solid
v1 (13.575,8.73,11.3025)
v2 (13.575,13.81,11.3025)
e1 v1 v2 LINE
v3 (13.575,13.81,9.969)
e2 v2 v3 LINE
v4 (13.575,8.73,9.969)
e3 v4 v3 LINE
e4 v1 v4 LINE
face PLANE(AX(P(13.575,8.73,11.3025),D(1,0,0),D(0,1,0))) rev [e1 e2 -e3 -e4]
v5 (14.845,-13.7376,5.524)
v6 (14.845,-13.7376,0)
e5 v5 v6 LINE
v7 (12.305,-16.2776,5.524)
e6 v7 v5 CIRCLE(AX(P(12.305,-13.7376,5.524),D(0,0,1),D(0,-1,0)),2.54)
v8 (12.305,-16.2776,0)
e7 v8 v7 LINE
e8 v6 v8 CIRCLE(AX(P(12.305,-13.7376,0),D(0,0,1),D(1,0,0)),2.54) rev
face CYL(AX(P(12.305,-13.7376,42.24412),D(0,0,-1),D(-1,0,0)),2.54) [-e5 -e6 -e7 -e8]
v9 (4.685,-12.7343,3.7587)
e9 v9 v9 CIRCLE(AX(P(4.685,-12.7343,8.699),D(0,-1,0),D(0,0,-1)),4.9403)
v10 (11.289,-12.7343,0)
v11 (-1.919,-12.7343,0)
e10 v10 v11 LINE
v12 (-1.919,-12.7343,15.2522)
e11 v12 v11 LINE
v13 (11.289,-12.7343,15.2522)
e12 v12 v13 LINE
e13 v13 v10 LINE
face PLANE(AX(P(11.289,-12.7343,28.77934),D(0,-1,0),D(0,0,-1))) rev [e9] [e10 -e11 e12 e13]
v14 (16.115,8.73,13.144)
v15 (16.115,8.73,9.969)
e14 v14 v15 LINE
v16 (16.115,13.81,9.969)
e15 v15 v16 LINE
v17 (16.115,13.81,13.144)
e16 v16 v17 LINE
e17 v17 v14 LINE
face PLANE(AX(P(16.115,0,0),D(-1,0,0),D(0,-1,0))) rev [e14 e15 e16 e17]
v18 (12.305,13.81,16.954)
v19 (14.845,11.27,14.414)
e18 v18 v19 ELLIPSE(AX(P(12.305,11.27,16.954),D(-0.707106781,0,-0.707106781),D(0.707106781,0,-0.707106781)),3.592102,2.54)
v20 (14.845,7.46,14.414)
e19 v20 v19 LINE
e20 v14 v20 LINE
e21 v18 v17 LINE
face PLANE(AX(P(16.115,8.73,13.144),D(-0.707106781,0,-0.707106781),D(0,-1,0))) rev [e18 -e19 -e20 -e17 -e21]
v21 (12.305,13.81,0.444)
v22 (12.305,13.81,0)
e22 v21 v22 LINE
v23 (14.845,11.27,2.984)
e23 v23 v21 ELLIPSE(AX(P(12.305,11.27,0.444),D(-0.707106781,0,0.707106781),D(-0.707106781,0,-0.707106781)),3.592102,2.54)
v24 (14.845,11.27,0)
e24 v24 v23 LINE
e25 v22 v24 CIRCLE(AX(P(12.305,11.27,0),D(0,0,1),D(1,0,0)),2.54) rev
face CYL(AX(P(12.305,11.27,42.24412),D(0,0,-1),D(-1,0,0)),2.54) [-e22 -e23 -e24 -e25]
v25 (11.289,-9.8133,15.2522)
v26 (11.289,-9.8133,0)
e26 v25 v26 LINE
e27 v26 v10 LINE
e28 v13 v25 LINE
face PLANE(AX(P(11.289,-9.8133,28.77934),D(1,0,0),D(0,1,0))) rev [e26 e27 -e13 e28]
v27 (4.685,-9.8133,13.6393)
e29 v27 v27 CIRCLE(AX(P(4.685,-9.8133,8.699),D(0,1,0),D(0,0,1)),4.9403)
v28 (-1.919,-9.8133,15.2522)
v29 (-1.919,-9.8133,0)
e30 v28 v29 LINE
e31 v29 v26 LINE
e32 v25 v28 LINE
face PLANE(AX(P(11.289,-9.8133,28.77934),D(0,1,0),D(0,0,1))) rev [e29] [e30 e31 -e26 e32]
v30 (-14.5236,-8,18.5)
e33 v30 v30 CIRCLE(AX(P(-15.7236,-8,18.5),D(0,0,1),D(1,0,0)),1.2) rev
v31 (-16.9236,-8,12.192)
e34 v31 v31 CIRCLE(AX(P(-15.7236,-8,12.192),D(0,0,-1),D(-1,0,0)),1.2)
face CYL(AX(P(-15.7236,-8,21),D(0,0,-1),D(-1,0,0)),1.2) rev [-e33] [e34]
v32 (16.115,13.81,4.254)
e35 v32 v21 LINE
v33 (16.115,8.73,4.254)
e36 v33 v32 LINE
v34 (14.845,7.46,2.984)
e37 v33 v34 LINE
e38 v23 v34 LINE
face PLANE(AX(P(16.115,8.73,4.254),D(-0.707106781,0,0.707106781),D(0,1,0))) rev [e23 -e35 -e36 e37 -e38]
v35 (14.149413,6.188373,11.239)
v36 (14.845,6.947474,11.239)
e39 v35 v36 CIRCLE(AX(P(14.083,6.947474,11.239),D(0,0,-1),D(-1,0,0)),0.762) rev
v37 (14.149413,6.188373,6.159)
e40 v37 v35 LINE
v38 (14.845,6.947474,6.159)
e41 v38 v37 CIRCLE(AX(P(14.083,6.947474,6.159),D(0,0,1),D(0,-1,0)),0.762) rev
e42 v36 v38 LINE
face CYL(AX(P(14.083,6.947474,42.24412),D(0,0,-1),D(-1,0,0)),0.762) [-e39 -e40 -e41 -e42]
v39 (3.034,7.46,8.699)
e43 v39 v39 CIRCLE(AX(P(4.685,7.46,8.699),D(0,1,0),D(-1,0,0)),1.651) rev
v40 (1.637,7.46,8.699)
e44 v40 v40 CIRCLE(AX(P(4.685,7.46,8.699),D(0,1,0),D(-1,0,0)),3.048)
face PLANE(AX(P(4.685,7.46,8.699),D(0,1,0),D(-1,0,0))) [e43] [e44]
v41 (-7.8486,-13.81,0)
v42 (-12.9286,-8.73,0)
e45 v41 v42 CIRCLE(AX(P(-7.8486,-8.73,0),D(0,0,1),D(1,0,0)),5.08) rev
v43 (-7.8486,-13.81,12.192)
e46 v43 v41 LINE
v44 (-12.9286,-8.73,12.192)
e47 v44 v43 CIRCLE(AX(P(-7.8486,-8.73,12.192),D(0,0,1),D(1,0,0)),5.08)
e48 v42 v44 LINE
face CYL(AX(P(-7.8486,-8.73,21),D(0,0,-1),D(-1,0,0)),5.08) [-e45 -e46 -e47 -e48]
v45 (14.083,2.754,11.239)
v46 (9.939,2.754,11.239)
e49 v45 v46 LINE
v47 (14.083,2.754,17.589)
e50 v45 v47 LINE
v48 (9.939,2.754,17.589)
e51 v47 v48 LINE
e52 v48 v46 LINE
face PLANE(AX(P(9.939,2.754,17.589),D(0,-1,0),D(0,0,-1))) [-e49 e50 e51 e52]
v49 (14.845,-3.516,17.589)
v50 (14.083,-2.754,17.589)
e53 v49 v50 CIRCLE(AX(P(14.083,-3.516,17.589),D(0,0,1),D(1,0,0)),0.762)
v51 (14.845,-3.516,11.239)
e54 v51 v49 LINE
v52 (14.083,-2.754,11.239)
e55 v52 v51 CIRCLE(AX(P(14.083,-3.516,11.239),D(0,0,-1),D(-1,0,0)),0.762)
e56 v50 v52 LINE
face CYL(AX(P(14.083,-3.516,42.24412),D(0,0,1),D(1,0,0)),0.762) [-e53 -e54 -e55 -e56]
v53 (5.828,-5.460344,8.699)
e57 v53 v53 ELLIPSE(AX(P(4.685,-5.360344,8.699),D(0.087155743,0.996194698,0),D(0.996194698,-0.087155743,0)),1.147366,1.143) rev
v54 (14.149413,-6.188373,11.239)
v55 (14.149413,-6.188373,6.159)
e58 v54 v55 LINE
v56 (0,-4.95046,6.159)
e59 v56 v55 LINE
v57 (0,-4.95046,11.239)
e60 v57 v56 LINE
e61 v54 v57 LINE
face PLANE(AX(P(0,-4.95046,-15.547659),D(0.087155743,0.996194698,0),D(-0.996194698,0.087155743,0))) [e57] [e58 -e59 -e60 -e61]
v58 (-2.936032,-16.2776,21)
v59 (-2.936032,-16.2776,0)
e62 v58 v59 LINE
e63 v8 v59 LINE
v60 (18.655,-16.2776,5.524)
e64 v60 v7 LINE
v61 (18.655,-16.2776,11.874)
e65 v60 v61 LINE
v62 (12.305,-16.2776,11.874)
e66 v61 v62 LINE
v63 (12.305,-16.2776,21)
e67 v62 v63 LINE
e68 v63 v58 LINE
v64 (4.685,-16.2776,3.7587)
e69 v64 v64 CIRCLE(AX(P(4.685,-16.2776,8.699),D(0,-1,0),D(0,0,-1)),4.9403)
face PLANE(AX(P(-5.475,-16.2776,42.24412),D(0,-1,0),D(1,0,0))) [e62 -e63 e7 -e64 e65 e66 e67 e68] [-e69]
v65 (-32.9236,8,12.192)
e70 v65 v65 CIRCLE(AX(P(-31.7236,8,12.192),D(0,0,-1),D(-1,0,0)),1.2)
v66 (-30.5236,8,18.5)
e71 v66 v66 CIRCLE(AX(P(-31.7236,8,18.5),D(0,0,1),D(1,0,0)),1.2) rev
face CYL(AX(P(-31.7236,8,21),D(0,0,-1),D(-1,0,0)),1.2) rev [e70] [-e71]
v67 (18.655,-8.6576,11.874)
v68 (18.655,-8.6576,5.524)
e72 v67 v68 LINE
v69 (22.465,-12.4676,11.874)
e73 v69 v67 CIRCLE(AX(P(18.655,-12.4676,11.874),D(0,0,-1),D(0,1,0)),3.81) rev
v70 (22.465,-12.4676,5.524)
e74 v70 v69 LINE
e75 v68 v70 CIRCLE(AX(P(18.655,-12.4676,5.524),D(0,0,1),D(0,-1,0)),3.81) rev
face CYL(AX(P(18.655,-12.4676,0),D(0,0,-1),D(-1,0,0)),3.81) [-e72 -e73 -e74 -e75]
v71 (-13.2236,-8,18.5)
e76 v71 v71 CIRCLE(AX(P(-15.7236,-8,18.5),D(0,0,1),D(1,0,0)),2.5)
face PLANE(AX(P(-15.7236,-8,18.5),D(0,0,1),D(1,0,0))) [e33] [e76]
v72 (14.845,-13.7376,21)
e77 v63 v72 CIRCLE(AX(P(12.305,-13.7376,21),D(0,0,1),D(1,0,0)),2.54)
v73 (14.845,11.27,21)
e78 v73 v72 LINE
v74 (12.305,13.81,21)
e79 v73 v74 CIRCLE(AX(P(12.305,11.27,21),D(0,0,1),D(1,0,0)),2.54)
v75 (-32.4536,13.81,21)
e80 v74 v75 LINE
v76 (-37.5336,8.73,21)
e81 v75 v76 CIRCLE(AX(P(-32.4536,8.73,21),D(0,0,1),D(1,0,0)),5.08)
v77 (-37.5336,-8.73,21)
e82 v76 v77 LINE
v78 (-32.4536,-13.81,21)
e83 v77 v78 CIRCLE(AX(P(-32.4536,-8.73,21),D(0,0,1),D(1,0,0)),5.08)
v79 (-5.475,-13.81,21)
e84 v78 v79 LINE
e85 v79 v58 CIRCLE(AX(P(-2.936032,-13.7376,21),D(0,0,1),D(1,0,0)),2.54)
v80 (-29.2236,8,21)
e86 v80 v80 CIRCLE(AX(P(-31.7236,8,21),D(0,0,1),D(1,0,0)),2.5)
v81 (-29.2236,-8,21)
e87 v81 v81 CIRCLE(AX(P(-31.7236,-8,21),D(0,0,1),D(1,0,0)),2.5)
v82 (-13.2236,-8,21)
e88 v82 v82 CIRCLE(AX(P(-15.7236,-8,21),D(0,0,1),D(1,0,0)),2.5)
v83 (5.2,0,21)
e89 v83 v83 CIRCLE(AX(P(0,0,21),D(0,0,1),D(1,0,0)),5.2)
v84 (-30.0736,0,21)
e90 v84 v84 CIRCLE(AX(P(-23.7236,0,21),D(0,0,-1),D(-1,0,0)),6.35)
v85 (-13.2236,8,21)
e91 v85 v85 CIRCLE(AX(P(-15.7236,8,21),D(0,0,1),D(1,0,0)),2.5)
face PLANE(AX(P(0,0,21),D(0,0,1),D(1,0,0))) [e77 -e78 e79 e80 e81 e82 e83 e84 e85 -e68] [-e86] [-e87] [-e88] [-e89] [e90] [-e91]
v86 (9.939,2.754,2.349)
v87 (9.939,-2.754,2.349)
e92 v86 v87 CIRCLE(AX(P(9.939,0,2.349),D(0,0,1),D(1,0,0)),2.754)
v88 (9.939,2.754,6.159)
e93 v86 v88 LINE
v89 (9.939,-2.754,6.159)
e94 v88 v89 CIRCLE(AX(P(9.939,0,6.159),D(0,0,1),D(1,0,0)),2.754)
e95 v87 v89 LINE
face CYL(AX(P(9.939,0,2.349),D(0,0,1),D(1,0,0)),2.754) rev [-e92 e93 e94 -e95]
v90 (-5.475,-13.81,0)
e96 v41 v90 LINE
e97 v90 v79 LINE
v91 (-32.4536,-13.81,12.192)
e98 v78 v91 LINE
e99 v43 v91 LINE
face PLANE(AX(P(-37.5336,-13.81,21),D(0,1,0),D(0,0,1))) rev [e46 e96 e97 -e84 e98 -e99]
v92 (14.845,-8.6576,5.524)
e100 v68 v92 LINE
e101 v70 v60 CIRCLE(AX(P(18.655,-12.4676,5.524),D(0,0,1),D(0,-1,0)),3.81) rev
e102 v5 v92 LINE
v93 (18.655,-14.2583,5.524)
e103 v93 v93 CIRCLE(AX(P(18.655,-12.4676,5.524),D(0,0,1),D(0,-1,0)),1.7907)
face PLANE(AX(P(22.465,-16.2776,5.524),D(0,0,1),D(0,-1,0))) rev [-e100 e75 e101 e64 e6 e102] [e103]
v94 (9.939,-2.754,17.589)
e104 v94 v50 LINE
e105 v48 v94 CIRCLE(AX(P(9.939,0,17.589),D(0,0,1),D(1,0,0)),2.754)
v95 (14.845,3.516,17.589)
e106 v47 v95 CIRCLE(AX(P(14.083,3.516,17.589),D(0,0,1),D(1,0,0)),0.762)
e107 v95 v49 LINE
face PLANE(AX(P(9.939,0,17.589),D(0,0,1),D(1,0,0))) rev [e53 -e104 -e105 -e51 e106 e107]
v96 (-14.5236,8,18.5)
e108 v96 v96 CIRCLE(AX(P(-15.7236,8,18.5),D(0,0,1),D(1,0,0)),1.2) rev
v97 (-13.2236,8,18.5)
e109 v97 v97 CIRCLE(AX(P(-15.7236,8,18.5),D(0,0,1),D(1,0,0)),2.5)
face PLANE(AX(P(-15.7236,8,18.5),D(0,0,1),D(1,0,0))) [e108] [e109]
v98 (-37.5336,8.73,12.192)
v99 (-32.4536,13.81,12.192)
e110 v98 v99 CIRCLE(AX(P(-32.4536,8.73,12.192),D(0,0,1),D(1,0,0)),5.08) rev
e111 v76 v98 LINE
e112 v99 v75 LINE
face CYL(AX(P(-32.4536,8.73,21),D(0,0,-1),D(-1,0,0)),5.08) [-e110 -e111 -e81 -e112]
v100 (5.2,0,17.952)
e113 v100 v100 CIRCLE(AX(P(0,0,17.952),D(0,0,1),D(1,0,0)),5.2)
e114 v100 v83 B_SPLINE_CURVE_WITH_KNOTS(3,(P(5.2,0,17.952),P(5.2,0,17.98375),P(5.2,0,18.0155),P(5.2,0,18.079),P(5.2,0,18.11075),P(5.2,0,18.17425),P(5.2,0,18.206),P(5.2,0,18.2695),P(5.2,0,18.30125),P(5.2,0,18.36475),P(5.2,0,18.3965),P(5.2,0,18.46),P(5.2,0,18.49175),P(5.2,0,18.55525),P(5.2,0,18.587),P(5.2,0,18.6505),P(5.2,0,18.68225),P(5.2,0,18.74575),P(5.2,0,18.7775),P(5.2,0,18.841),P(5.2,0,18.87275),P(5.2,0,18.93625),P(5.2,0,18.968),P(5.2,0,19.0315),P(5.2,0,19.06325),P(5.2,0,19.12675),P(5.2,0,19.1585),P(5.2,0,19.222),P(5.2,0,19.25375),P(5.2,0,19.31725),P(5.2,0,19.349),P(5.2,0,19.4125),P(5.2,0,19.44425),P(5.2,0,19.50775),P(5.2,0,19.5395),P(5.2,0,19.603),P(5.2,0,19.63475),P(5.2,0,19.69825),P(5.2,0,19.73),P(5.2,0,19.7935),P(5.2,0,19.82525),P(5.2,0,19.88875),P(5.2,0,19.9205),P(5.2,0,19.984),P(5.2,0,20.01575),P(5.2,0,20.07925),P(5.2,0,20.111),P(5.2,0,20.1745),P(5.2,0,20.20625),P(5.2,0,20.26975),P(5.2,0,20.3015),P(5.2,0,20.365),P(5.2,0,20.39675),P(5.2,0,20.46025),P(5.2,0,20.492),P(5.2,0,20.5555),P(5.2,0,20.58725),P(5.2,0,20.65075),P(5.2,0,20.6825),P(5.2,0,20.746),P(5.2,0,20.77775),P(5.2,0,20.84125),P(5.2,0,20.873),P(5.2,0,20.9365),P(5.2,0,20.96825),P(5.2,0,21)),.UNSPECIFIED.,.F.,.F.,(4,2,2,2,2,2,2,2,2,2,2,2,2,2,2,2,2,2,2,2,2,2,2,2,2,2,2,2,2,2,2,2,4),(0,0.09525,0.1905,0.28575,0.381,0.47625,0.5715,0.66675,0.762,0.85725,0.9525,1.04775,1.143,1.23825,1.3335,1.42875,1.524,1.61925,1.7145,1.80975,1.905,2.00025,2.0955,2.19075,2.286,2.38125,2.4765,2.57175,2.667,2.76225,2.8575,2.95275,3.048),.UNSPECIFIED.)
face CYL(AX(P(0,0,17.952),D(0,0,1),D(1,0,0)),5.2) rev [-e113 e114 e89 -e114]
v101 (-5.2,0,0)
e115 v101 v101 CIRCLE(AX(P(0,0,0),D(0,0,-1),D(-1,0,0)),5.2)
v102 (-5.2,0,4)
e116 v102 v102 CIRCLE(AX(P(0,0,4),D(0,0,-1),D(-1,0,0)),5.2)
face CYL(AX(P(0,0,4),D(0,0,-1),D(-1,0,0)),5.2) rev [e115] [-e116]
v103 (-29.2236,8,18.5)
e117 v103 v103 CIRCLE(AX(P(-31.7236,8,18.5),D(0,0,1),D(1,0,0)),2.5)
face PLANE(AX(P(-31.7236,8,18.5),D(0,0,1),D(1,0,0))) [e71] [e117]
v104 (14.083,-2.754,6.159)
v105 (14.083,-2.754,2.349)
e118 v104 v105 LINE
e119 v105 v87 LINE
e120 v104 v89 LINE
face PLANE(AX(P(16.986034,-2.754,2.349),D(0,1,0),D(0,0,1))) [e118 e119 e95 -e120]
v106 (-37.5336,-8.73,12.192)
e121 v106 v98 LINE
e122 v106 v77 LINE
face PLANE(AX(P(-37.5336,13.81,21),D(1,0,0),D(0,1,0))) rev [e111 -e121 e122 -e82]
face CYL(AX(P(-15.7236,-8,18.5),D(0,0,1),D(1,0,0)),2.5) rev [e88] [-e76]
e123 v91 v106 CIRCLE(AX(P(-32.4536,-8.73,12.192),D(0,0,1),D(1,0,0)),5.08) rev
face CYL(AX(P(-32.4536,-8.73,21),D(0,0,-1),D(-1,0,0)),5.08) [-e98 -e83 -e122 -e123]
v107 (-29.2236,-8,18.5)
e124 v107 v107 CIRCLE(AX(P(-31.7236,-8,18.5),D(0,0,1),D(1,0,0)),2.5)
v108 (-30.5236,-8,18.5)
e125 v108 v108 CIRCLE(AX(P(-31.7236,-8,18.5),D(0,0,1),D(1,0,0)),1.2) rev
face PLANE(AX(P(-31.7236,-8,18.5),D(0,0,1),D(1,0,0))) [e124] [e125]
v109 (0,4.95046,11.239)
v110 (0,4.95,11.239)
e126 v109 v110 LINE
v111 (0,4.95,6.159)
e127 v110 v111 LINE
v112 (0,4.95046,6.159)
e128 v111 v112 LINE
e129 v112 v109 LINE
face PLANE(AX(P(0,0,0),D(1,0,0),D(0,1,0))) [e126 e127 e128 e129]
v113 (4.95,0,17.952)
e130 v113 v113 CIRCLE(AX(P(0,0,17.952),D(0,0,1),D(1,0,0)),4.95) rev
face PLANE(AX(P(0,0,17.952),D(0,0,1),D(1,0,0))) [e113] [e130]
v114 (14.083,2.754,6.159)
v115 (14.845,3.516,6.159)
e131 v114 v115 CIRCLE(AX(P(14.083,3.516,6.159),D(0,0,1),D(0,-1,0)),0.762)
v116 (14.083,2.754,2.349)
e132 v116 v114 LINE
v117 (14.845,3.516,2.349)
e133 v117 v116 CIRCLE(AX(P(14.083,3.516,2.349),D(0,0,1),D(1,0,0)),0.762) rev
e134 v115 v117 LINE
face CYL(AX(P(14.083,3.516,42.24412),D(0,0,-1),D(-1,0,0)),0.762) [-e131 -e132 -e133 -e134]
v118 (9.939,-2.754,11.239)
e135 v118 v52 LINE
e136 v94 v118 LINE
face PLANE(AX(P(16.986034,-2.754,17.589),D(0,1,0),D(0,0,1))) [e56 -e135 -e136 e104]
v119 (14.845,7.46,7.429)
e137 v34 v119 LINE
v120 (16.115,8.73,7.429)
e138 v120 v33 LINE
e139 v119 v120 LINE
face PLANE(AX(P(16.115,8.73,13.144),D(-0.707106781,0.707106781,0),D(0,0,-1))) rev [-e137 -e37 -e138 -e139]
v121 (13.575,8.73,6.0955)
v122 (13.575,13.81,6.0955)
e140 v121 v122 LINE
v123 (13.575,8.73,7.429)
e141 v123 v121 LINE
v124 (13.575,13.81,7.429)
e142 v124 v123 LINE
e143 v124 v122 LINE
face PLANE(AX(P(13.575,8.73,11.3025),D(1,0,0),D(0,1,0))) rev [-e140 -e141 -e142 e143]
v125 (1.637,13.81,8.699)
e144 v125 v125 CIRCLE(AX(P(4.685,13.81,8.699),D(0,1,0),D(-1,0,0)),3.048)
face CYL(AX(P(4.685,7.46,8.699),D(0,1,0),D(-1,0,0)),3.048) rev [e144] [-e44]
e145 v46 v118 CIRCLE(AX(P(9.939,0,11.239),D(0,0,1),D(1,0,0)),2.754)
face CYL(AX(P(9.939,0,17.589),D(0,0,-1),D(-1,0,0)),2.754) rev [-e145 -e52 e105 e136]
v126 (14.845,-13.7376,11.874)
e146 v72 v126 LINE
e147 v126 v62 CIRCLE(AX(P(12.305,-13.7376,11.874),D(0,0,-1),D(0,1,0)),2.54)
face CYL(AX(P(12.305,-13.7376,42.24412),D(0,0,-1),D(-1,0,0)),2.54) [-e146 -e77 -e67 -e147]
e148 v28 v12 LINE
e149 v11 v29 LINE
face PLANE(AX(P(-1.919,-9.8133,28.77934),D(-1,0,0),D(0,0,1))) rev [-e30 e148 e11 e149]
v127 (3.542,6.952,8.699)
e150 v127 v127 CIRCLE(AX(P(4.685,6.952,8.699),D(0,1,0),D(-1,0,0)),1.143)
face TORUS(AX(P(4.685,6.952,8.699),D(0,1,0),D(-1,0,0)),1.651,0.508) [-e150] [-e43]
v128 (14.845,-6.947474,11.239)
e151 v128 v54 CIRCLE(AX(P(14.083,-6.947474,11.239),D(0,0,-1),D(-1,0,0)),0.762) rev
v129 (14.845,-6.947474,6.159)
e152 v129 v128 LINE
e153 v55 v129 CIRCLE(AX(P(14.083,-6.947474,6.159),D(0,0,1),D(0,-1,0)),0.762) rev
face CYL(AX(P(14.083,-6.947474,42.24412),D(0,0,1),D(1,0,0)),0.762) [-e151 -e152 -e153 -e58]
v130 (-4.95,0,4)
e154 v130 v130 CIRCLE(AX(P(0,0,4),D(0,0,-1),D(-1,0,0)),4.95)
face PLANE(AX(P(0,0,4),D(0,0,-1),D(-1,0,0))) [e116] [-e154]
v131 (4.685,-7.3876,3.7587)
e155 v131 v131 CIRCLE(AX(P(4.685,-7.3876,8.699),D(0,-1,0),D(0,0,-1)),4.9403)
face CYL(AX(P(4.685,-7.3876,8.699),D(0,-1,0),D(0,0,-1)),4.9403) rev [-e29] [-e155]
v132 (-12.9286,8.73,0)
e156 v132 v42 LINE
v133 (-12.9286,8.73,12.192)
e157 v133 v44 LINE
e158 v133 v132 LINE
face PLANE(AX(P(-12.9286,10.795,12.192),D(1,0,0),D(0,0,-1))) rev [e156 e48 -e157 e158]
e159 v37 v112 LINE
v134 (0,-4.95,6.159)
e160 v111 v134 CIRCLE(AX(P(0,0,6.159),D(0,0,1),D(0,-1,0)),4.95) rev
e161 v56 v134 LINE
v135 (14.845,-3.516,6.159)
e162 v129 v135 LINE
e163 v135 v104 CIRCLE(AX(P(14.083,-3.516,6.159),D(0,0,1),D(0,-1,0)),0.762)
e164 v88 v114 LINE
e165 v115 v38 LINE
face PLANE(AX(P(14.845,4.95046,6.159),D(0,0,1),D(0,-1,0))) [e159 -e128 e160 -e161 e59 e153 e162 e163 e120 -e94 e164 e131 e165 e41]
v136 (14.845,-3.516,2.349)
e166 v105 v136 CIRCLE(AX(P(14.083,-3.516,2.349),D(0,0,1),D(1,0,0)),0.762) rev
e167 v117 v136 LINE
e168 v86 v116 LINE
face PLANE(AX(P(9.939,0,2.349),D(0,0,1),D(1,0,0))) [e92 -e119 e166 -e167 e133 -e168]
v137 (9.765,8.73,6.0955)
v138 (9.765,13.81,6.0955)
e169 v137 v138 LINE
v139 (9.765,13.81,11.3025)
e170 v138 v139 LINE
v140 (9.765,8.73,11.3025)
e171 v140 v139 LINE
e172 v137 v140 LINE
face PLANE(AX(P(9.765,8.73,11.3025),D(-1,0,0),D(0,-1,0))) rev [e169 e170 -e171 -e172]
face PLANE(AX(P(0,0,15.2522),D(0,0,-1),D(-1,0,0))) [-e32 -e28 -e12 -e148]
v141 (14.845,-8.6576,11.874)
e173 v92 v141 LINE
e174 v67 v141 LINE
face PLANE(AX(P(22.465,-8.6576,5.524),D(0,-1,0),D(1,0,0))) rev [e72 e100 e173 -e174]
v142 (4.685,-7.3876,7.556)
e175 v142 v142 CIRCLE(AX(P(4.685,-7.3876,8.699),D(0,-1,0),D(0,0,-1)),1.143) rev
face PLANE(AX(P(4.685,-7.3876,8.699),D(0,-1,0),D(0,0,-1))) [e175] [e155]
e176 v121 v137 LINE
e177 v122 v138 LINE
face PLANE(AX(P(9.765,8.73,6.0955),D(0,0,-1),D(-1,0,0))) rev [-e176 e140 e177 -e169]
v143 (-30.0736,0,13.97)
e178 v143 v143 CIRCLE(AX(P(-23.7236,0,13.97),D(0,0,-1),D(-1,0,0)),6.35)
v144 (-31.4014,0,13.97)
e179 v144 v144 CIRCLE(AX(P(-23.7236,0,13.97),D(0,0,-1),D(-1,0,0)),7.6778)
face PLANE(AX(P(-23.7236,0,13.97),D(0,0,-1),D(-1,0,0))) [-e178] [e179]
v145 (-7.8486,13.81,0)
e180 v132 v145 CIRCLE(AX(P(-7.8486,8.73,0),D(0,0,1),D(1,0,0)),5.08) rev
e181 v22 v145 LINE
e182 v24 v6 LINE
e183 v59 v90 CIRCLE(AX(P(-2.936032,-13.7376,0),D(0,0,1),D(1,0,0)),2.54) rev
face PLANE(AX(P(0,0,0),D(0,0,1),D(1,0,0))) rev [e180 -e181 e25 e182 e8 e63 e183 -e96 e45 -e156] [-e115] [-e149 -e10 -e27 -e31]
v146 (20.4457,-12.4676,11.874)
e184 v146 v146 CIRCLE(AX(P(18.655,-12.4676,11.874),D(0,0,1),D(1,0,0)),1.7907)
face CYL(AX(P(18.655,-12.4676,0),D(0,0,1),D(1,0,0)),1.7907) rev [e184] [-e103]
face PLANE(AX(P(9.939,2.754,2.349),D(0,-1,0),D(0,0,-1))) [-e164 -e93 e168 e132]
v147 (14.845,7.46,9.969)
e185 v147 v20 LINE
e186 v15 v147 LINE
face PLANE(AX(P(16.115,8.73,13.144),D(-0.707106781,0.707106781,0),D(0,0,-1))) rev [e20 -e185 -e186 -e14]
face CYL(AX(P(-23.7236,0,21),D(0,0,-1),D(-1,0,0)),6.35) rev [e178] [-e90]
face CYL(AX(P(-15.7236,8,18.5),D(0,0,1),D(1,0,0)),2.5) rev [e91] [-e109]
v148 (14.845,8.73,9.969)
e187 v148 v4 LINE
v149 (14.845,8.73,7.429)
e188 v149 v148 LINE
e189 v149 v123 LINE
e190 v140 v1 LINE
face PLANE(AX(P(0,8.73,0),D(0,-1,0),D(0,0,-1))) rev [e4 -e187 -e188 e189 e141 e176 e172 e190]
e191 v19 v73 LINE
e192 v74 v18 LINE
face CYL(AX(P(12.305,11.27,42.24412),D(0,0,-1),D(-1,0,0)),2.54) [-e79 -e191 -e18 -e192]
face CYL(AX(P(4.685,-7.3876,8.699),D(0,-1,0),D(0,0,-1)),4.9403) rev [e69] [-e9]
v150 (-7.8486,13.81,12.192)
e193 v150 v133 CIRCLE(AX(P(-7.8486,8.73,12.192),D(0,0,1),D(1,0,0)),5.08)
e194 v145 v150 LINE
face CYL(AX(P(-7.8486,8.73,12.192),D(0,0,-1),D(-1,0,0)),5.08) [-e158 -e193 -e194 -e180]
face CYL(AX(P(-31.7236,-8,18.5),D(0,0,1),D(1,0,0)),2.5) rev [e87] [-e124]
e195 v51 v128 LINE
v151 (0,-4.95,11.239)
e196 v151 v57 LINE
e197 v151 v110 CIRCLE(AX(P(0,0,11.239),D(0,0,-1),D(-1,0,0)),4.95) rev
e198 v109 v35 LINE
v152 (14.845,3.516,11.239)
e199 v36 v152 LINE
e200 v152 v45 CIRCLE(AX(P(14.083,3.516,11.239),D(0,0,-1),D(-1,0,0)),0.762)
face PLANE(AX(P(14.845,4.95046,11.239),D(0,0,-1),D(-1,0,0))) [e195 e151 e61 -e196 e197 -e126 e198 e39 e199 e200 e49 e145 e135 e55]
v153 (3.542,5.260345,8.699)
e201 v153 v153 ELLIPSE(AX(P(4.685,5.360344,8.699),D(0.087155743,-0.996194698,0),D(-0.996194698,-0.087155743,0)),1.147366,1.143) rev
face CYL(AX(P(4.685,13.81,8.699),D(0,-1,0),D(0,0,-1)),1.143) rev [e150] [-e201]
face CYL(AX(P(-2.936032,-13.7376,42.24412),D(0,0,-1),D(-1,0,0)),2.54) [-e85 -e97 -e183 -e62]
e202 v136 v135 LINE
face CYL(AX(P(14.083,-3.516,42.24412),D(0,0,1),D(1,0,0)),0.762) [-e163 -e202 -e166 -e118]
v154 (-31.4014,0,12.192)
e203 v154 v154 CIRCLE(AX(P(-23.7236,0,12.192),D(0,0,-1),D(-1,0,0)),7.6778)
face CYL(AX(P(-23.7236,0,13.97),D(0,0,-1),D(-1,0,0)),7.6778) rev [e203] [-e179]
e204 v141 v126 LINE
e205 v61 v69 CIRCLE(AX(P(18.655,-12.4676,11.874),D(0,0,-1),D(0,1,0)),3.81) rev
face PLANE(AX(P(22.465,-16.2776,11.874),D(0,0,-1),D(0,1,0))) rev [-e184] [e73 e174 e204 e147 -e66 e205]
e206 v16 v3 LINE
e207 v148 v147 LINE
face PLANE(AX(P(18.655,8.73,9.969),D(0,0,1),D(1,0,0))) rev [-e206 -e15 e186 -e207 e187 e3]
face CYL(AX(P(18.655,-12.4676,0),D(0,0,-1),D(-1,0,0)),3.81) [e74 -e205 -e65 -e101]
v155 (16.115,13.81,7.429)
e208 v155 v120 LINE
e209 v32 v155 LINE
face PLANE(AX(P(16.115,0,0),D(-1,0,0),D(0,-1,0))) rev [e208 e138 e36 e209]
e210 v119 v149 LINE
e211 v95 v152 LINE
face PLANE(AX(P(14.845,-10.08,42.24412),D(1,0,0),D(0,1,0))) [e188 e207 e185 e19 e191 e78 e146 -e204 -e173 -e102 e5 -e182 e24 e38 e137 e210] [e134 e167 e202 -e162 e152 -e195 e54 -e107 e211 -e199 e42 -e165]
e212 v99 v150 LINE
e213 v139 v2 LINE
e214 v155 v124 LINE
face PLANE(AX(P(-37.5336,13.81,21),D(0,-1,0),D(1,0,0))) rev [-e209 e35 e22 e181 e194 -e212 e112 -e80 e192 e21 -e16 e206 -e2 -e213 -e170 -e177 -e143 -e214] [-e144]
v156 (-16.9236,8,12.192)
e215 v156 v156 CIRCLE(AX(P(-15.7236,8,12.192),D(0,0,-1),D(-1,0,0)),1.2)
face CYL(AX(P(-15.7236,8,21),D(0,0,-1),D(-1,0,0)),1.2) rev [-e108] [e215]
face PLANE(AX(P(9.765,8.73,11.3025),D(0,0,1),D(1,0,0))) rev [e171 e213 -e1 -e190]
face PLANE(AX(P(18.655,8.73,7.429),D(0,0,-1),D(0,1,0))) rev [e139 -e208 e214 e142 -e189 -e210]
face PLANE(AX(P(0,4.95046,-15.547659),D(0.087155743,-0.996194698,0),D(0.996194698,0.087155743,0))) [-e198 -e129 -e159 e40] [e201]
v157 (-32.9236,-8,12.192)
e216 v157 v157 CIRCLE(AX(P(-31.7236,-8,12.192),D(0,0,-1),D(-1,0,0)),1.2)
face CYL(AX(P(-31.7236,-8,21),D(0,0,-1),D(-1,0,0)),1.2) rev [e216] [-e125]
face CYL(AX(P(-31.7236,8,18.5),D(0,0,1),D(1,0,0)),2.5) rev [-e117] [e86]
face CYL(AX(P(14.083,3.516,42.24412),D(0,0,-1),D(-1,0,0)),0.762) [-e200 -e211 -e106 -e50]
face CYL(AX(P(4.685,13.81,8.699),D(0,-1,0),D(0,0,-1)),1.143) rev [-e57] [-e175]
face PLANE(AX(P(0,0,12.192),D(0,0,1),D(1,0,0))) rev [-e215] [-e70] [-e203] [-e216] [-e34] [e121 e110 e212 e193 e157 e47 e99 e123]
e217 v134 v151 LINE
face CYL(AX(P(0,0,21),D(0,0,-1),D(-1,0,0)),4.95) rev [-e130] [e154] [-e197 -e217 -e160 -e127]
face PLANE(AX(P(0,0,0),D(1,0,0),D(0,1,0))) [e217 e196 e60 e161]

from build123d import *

# Parameters (mm, degrees)
SKETCH5_W               = 50.1536
SKETCH5_H               = 27.62
BOSS_EXTRUDE1_DEPTH     = 21
SKETCH6_R               = 5.2
CUT_EXTRUDE1_DEPTH      = 4
SKETCH7_R               = 4.95
CUT_EXTRUDE2_DEPTH      = 44.456728236
CUT_EXTRUDE3_START      = -3.048
SKETCH8_R               = 5.2
CUT_EXTRUDE3_DEPTH      = 3.048
SKETCH11_W              = 20.32
SKETCH11_H              = 6.1976
BOSS_EXTRUDE2_DEPTH     = 21
CUT_EXTRUDE4_DEPTH      = 52.113946521
CUT_EXTRUDE4_DEPTH_BACK = 52.113946521
SKETCH9_R               = 1.143
CUT_EXTRUDE5_START      = -15.2522
SKETCH12_W              = 13.208
SKETCH12_H              = 2.921
CUT_EXTRUDE5_DEPTH      = 15.2522
SKETCH13_R              = 4.9403
CUT_EXTRUDE6_DEPTH      = 8.89
SKETCH14_R              = 3.048
CUT_EXTRUDE7_DEPTH      = 6.35
CUT_EXTRUDE8_DEPTH      = 12.192
SKETCH16_R              = 7.6778
CUT_EXTRUDE9_DEPTH      = 1.778
SKETCH17_R              = 6.35
CUT_EXTRUDE10_DEPTH     = 44.23068691
SKETCH18_R              = 1.2
CUT_EXTRUDE11_DEPTH     = 43.689299066
SKETCH19_W              = 2.225
SKETCH19_H              = 21
BOSS_EXTRUDE3_DEPTH     = 23.89
SKETCH20_W              = 5.08
SKETCH20_H              = 9.90092
CUT_EXTRUDE12_DEPTH     = 46.986208701
CUT_EXTRUDE13_REACH     = 44.427
SKETCH23_W              = 8.89
SKETCH23_H              = 5.08
BOSS_EXTRUDE4_DEPTH     = 1.27
CUT_EXTRUDE15_DEPTH     = 6.35
CUT_EXTRUDE16_START     = -3.81
CUT_EXTRUDE16_DEPTH     = 3.81
SKETCH27_W              = 6.35
SKETCH27_H              = 7.62
BOSS_EXTRUDE6_DEPTH     = 7.62
CHAMFER1_SIZE           = 1.27
FILLET2_R               = 3.81
SKETCH28_W              = 3.81
SKETCH28_H              = 5.207
CUT_EXTRUDE17_DEPTH     = 5.08
SKETCH29_W              = 2.54
SKETCH29_H              = 5.08
CUT_EXTRUDE18_DEPTH     = 5.08
SKETCH30_R              = 1.7907
CUT_EXTRUDE19_DEPTH     = 43.599568856
SKETCH31_W              = 2.54
SKETCH31_H              = 1.62646495
CUT_EXTRUDE20_DEPTH     = 59.732256893
FILLET3_R               = 0.508
SKETCH32_R              = 2.5
CUT_EXTRUDE21_DEPTH     = 2.5
FILLET4_R               = 5.08
FILLET5_R               = 5.08
FILLET6_R               = 2.54
FILLET7_R               = 2.54
FILLET8_R               = 0.762
FILLET9_R               = 0.762


# Some blends are built 0.0001 mm under size
with BuildPart() as part:
    # Sketch5 → Boss-Extrude1 (new body)
    with BuildSketch(Plane.XY):
        with Locations((-12.4568, 0)):
            Rectangle(SKETCH5_W, SKETCH5_H)
    extrude(amount=BOSS_EXTRUDE1_DEPTH)

    # Sketch6 → Cut-Extrude1 (cut)
    with BuildSketch(Plane(origin=(0, 0, 0), x_dir=(-1, 0, 0), z_dir=(0, 0, -1))):
        Circle(SKETCH6_R)
    extrude(amount=-CUT_EXTRUDE1_DEPTH, mode=Mode.SUBTRACT)

    # Sketch7 → Cut-Extrude2 (cut, through all)
    with BuildSketch(Plane(origin=(0, 0, 4), x_dir=(-1, 0, 0), z_dir=(0, 0, -1))):
        Circle(SKETCH7_R)
    extrude(amount=-CUT_EXTRUDE2_DEPTH, mode=Mode.SUBTRACT)

    # Sketch8 → Cut-Extrude3 (cut)
    with BuildSketch(Plane.XY.offset(21).offset(CUT_EXTRUDE3_START)):
        with Locations(Location((0, 0, 0), (0, 0, 180))):
            Circle(SKETCH8_R)
    extrude(amount=CUT_EXTRUDE3_DEPTH, mode=Mode.SUBTRACT)

    # Sketch11 → Boss-Extrude2 (add)
    with BuildSketch(Plane(origin=(0, 0, 0), x_dir=(-1, 0, 0), z_dir=(0, 0, -1))):
        with Locations((-4.685, -13.1788)):
            Rectangle(SKETCH11_W, SKETCH11_H)
    extrude(amount=-BOSS_EXTRUDE2_DEPTH)

    # Sketch9 → Cut-Extrude4 (cut, two sides: drawn at the far end of the back side and taken through both)
    with BuildSketch(Plane.XZ.offset(13.81).offset(-CUT_EXTRUDE4_DEPTH_BACK)):
        with Locations(Location((4.685, 8.699, 0), (0, 0, 270))):
            Circle(SKETCH9_R)
    extrude(amount=CUT_EXTRUDE4_DEPTH + CUT_EXTRUDE4_DEPTH_BACK, mode=Mode.SUBTRACT)

    # Sketch12 → Cut-Extrude5 (cut)
    with BuildSketch(Plane(origin=(0, 0, 0), x_dir=(-1, 0, 0), z_dir=(0, 0, -1)).offset(CUT_EXTRUDE5_START)):
        with Locations((-4.685, -11.2738)):
            Rectangle(SKETCH12_W, SKETCH12_H)
    extrude(amount=CUT_EXTRUDE5_DEPTH, mode=Mode.SUBTRACT)

    # Sketch13 → Cut-Extrude6 (cut)
    with BuildSketch(Plane.XZ.offset(16.2776)):
        with Locations(Location((4.685, 8.699, 0), (0, 0, 270))):
            Circle(SKETCH13_R)
    extrude(amount=-CUT_EXTRUDE6_DEPTH, mode=Mode.SUBTRACT)

    # Sketch14 → Cut-Extrude7 (cut)
    with BuildSketch(Plane(origin=(0, 13.81, 0), x_dir=(1, 0, 0), z_dir=(0, 1, 0))):
        with Locations(Location((4.685, -8.699, 0), (0, 0, 180))):
            Circle(SKETCH14_R)
    extrude(amount=-CUT_EXTRUDE7_DEPTH, mode=Mode.SUBTRACT)

    # Sketch15 → Cut-Extrude8 (cut)
    with BuildSketch(Plane(origin=(0, 0, 0), x_dir=(-1, 0, 0), z_dir=(0, 0, -1))):
        Polygon((12.9286, 10.795), (12.9286, 13.81), (37.5336, 13.81), (37.5336, -13.81), (12.9286, -13.81), align=None)
    extrude(amount=-CUT_EXTRUDE8_DEPTH, mode=Mode.SUBTRACT)

    # Sketch16 → Cut-Extrude9 (cut)
    with BuildSketch(Plane(origin=(0, 0, 12.192), x_dir=(-1, 0, 0), z_dir=(0, 0, -1))):
        with Locations((23.7236, 0)):
            Circle(SKETCH16_R)
    extrude(amount=-CUT_EXTRUDE9_DEPTH, mode=Mode.SUBTRACT)

    # Sketch17 → Cut-Extrude10 (cut, through all)
    with BuildSketch(Plane(origin=(0, 0, 13.97), x_dir=(-1, 0, 0), z_dir=(0, 0, -1))):
        with Locations((23.7236, 0)):
            Circle(SKETCH17_R)
    extrude(amount=-CUT_EXTRUDE10_DEPTH, mode=Mode.SUBTRACT)

    # Sketch18 → Cut-Extrude11 (cut, through all)
    with BuildSketch(Plane(origin=(0, 0, 12.192), x_dir=(-1, 0, 0), z_dir=(0, 0, -1))):
        with Locations((15.7236, 8)):
            Circle(SKETCH18_R)
        with Locations((31.7236, 8)):
            Circle(SKETCH18_R)
        with Locations((31.7236, -8)):
            Circle(SKETCH18_R)
        with Locations((15.7236, -8)):
            Circle(SKETCH18_R)
    extrude(amount=-CUT_EXTRUDE11_DEPTH, mode=Mode.SUBTRACT)

    # Sketch19 → Boss-Extrude3 (add)
    with BuildSketch(Plane(origin=(0, -10.08, 0), x_dir=(1, 0, 0), z_dir=(0, 1, 0))):
        with Locations((13.7325, -10.5)):
            Rectangle(SKETCH19_W, SKETCH19_H)
    extrude(amount=BOSS_EXTRUDE3_DEPTH)

    # Sketch20 → Cut-Extrude12 (cut, through all)
    with BuildSketch(Plane(origin=(0, 0, 0), x_dir=(0, 0, -1), z_dir=(1, 0, 0))):
        with Locations((-8.699, 0)):
            Rectangle(SKETCH20_W, SKETCH20_H)
    extrude(amount=CUT_EXTRUDE12_DEPTH, mode=Mode.SUBTRACT)

    # Cut-Extrude13: up to this face of the body (flat: up to its plane)
    cut_extrude13_end = Plane(part.part.faces().sort_by_distance((9.310423436, 0, 6.159))[0])
    # Sketch22 → Cut-Extrude13 (cut, up to the picked face)
    with BuildSketch(Plane(origin=(0, 0, 11.239), x_dir=(-1, 0, 0), z_dir=(0, 0, -1)), mode=Mode.PRIVATE) as cut_extrude13_sk1:
        Polygon((0, 4.95046), (-17.421153116, 6.474613403), (-17.421153116, -6.474613403), (0, -4.95046), align=None)
    cut_extrude13_tool1 = split(extrude(cut_extrude13_sk1.sketch, amount=CUT_EXTRUDE13_REACH, mode=Mode.PRIVATE), bisect_by=cut_extrude13_end, keep=Keep.BOTH, mode=Mode.PRIVATE)
    add(cut_extrude13_tool1.solids().sort_by(Axis((9.097919, 0, 11.239), (0, 0, -1)))[0], mode=Mode.SUBTRACT)

    # Sketch23 → Boss-Extrude4 (add)
    with BuildSketch(Plane(origin=(14.845, 0, 0), x_dir=(0, 0, -1), z_dir=(1, 0, 0))):
        with Locations((-8.699, 11.27)):
            Rectangle(SKETCH23_W, SKETCH23_H)
    extrude(amount=BOSS_EXTRUDE4_DEPTH)

    # Sketch25 → Cut-Extrude15 (cut)
    with BuildSketch(Plane.XY.offset(11.239)):
        with BuildLine():
            Line((9.939, 2.754), (16.986034424, 2.754))
            Line((16.986034424, 2.754), (16.986034424, -2.754))
            Line((16.986034424, -2.754), (9.939, -2.754))
            ThreePointArc((9.939, -2.754), (7.185, 0), (9.939, 2.754))
        make_face()
    extrude(amount=CUT_EXTRUDE15_DEPTH, mode=Mode.SUBTRACT)

    # Sketch26 → Cut-Extrude16 (cut)
    with BuildSketch(Plane.XY.offset(6.159).offset(CUT_EXTRUDE16_START)):
        with BuildLine():
            Line((16.986034424, 2.754), (16.986034424, -2.754))
            Line((16.986034424, -2.754), (9.939, -2.754))
            ThreePointArc((9.939, -2.754), (7.185, 0), (9.939, 2.754))
            Line((9.939, 2.754), (16.986034424, 2.754))
        make_face()
    extrude(amount=CUT_EXTRUDE16_DEPTH, mode=Mode.SUBTRACT)

    # Sketch27 → Boss-Extrude6 (add)
    with BuildSketch(Plane(origin=(14.845, 0, 0), x_dir=(0, 0, -1), z_dir=(1, 0, 0))):
        with Locations((-8.699, -12.4676)):
            Rectangle(SKETCH27_W, SKETCH27_H)
    extrude(amount=BOSS_EXTRUDE6_DEPTH)

    # Chamfer1
    chamfer1_edges = [part.edges().sort_by_distance(p)[0] for p in [
        (14.845, 11.27, 13.144),
        (14.845, 11.27, 4.254),
        (14.845, 8.73, 8.699),
    ]]
    chamfer(chamfer1_edges, length=CHAMFER1_SIZE - 0.0001)  # a hair under: the kernel refuses the full size

    # Fillet2
    fillet2_edges = [part.edges().sort_by_distance(p)[0] for p in [
        (22.465, -16.2776, 8.699),
        (22.465, -8.6576, 8.699),
    ]]
    fillet(fillet2_edges, radius=FILLET2_R - 0.0001)  # a hair under: the kernel refuses the full size

    # Sketch28 → Cut-Extrude17 (cut)
    with BuildSketch(Plane(origin=(0, 13.81, 0), x_dir=(1, 0, 0), z_dir=(0, 1, 0))):
        with Locations((11.67, -8.699)):
            Rectangle(SKETCH28_W, SKETCH28_H)
    extrude(amount=-CUT_EXTRUDE17_DEPTH, mode=Mode.SUBTRACT)

    # Sketch29 → Cut-Extrude18 (cut)
    with BuildSketch(Plane.ZY.offset(-13.575)):
        with Locations((8.699, 11.27)):
            Rectangle(SKETCH29_W, SKETCH29_H)
    extrude(amount=-CUT_EXTRUDE18_DEPTH, mode=Mode.SUBTRACT)

    # Sketch30 → Cut-Extrude19 (cut, through all)
    with BuildSketch(Plane.XY.offset(11.874)):
        with Locations((18.655, -12.4676)):
            Circle(SKETCH30_R)
    extrude(amount=-CUT_EXTRUDE19_DEPTH, mode=Mode.SUBTRACT)

    # Sketch31 → Cut-Extrude20 (cut, through all)
    with BuildSketch(Plane(origin=(14.845, 0, 0), x_dir=(0, 0, -1), z_dir=(1, 0, 0))):
        with Locations((-8.699, 7.916767525)):
            Rectangle(SKETCH31_W, SKETCH31_H)
    extrude(amount=CUT_EXTRUDE20_DEPTH, mode=Mode.SUBTRACT)

    # Fillet3
    fillet3_edges = [part.edges().sort_by_distance(p)[0] for p in [
        (4.685, 7.46, 9.842),
    ]]
    fillet(fillet3_edges, radius=FILLET3_R)

    # Sketch32 → Cut-Extrude21 (cut)
    with BuildSketch(Plane.XY.offset(21)):
        with Locations((-15.7236, 8)):
            Circle(SKETCH32_R)
        with Locations((-31.7236, 8)):
            Circle(SKETCH32_R)
        with Locations((-31.7236, -8)):
            Circle(SKETCH32_R)
        with Locations((-15.7236, -8)):
            Circle(SKETCH32_R)
    extrude(amount=-CUT_EXTRUDE21_DEPTH, mode=Mode.SUBTRACT)

    # Fillet4
    fillet4_edges = [part.edges().sort_by_distance(p)[0] for p in [
        (-37.5336, -13.81, 16.596),
        (-37.5336, 13.81, 16.596),
    ]]
    fillet(fillet4_edges, radius=FILLET4_R)

    # Fillet5
    fillet5_edges = [part.edges().sort_by_distance(p)[0] for p in [
        (-12.9286, -13.81, 6.096),
        (-12.9286, 13.81, 6.096),
    ]]
    fillet(fillet5_edges, radius=FILLET5_R)

    # Fillet6
    fillet6_edges = [part.edges().sort_by_distance(p)[0] for p in [
        (14.845, 13.81, 1.49205),
        (14.845, -16.2776, 2.762),
        (14.845, 13.81, 17.70695),
        (14.845, -16.2776, 16.437),
    ]]
    fillet(fillet6_edges, radius=FILLET6_R)

    # Fillet7
    # the kernel refuses this fillet: 2.54 mm, written as the material it takes off along each edge
    with BuildSketch(Plane(origin=(-5.475, -16.2776, -6.34741987), x_dir=(1, 0, 0), z_dir=(0, 0, 1))) as fillet7_piece_1:
        with BuildLine():
            CenterArc((2.538967948, 2.54), FILLET7_R, 181.63337652, 88.36662348)
            Line((0, 2.4676), (-0.050779359, 2.466152))
            ThreePointArc((-0.050779359, 2.466152), (-0.0508, 1.2338), (-0.0508, 0))
            Line((-0.0508, 0), (0, -0.0508))
            Line((0, -0.0508), (2.538967948, -0.0508))
            Line((2.538967948, -0.0508), (2.538967948, 0))
        make_face()
    extrude(amount=33.694839739, mode=Mode.SUBTRACT)

    # Fillet8
    fillet8_edges = [part.edges().sort_by_distance(p)[0] for p in [
        (14.845, 6.24922921, 8.699),
        (14.845, -6.24922921, 8.699),
    ]]
    fillet(fillet8_edges, radius=FILLET8_R)

    # Fillet9
    fillet9_edges = [part.edges().sort_by_distance(p)[0] for p in [
        (14.845, -2.754, 14.414),
        (14.845, 2.754, 14.414),
        (14.845, 2.754, 4.254),
        (14.845, -2.754, 4.254),
    ]]
    fillet(fillet9_edges, radius=FILLET9_R)


solid = part.part
